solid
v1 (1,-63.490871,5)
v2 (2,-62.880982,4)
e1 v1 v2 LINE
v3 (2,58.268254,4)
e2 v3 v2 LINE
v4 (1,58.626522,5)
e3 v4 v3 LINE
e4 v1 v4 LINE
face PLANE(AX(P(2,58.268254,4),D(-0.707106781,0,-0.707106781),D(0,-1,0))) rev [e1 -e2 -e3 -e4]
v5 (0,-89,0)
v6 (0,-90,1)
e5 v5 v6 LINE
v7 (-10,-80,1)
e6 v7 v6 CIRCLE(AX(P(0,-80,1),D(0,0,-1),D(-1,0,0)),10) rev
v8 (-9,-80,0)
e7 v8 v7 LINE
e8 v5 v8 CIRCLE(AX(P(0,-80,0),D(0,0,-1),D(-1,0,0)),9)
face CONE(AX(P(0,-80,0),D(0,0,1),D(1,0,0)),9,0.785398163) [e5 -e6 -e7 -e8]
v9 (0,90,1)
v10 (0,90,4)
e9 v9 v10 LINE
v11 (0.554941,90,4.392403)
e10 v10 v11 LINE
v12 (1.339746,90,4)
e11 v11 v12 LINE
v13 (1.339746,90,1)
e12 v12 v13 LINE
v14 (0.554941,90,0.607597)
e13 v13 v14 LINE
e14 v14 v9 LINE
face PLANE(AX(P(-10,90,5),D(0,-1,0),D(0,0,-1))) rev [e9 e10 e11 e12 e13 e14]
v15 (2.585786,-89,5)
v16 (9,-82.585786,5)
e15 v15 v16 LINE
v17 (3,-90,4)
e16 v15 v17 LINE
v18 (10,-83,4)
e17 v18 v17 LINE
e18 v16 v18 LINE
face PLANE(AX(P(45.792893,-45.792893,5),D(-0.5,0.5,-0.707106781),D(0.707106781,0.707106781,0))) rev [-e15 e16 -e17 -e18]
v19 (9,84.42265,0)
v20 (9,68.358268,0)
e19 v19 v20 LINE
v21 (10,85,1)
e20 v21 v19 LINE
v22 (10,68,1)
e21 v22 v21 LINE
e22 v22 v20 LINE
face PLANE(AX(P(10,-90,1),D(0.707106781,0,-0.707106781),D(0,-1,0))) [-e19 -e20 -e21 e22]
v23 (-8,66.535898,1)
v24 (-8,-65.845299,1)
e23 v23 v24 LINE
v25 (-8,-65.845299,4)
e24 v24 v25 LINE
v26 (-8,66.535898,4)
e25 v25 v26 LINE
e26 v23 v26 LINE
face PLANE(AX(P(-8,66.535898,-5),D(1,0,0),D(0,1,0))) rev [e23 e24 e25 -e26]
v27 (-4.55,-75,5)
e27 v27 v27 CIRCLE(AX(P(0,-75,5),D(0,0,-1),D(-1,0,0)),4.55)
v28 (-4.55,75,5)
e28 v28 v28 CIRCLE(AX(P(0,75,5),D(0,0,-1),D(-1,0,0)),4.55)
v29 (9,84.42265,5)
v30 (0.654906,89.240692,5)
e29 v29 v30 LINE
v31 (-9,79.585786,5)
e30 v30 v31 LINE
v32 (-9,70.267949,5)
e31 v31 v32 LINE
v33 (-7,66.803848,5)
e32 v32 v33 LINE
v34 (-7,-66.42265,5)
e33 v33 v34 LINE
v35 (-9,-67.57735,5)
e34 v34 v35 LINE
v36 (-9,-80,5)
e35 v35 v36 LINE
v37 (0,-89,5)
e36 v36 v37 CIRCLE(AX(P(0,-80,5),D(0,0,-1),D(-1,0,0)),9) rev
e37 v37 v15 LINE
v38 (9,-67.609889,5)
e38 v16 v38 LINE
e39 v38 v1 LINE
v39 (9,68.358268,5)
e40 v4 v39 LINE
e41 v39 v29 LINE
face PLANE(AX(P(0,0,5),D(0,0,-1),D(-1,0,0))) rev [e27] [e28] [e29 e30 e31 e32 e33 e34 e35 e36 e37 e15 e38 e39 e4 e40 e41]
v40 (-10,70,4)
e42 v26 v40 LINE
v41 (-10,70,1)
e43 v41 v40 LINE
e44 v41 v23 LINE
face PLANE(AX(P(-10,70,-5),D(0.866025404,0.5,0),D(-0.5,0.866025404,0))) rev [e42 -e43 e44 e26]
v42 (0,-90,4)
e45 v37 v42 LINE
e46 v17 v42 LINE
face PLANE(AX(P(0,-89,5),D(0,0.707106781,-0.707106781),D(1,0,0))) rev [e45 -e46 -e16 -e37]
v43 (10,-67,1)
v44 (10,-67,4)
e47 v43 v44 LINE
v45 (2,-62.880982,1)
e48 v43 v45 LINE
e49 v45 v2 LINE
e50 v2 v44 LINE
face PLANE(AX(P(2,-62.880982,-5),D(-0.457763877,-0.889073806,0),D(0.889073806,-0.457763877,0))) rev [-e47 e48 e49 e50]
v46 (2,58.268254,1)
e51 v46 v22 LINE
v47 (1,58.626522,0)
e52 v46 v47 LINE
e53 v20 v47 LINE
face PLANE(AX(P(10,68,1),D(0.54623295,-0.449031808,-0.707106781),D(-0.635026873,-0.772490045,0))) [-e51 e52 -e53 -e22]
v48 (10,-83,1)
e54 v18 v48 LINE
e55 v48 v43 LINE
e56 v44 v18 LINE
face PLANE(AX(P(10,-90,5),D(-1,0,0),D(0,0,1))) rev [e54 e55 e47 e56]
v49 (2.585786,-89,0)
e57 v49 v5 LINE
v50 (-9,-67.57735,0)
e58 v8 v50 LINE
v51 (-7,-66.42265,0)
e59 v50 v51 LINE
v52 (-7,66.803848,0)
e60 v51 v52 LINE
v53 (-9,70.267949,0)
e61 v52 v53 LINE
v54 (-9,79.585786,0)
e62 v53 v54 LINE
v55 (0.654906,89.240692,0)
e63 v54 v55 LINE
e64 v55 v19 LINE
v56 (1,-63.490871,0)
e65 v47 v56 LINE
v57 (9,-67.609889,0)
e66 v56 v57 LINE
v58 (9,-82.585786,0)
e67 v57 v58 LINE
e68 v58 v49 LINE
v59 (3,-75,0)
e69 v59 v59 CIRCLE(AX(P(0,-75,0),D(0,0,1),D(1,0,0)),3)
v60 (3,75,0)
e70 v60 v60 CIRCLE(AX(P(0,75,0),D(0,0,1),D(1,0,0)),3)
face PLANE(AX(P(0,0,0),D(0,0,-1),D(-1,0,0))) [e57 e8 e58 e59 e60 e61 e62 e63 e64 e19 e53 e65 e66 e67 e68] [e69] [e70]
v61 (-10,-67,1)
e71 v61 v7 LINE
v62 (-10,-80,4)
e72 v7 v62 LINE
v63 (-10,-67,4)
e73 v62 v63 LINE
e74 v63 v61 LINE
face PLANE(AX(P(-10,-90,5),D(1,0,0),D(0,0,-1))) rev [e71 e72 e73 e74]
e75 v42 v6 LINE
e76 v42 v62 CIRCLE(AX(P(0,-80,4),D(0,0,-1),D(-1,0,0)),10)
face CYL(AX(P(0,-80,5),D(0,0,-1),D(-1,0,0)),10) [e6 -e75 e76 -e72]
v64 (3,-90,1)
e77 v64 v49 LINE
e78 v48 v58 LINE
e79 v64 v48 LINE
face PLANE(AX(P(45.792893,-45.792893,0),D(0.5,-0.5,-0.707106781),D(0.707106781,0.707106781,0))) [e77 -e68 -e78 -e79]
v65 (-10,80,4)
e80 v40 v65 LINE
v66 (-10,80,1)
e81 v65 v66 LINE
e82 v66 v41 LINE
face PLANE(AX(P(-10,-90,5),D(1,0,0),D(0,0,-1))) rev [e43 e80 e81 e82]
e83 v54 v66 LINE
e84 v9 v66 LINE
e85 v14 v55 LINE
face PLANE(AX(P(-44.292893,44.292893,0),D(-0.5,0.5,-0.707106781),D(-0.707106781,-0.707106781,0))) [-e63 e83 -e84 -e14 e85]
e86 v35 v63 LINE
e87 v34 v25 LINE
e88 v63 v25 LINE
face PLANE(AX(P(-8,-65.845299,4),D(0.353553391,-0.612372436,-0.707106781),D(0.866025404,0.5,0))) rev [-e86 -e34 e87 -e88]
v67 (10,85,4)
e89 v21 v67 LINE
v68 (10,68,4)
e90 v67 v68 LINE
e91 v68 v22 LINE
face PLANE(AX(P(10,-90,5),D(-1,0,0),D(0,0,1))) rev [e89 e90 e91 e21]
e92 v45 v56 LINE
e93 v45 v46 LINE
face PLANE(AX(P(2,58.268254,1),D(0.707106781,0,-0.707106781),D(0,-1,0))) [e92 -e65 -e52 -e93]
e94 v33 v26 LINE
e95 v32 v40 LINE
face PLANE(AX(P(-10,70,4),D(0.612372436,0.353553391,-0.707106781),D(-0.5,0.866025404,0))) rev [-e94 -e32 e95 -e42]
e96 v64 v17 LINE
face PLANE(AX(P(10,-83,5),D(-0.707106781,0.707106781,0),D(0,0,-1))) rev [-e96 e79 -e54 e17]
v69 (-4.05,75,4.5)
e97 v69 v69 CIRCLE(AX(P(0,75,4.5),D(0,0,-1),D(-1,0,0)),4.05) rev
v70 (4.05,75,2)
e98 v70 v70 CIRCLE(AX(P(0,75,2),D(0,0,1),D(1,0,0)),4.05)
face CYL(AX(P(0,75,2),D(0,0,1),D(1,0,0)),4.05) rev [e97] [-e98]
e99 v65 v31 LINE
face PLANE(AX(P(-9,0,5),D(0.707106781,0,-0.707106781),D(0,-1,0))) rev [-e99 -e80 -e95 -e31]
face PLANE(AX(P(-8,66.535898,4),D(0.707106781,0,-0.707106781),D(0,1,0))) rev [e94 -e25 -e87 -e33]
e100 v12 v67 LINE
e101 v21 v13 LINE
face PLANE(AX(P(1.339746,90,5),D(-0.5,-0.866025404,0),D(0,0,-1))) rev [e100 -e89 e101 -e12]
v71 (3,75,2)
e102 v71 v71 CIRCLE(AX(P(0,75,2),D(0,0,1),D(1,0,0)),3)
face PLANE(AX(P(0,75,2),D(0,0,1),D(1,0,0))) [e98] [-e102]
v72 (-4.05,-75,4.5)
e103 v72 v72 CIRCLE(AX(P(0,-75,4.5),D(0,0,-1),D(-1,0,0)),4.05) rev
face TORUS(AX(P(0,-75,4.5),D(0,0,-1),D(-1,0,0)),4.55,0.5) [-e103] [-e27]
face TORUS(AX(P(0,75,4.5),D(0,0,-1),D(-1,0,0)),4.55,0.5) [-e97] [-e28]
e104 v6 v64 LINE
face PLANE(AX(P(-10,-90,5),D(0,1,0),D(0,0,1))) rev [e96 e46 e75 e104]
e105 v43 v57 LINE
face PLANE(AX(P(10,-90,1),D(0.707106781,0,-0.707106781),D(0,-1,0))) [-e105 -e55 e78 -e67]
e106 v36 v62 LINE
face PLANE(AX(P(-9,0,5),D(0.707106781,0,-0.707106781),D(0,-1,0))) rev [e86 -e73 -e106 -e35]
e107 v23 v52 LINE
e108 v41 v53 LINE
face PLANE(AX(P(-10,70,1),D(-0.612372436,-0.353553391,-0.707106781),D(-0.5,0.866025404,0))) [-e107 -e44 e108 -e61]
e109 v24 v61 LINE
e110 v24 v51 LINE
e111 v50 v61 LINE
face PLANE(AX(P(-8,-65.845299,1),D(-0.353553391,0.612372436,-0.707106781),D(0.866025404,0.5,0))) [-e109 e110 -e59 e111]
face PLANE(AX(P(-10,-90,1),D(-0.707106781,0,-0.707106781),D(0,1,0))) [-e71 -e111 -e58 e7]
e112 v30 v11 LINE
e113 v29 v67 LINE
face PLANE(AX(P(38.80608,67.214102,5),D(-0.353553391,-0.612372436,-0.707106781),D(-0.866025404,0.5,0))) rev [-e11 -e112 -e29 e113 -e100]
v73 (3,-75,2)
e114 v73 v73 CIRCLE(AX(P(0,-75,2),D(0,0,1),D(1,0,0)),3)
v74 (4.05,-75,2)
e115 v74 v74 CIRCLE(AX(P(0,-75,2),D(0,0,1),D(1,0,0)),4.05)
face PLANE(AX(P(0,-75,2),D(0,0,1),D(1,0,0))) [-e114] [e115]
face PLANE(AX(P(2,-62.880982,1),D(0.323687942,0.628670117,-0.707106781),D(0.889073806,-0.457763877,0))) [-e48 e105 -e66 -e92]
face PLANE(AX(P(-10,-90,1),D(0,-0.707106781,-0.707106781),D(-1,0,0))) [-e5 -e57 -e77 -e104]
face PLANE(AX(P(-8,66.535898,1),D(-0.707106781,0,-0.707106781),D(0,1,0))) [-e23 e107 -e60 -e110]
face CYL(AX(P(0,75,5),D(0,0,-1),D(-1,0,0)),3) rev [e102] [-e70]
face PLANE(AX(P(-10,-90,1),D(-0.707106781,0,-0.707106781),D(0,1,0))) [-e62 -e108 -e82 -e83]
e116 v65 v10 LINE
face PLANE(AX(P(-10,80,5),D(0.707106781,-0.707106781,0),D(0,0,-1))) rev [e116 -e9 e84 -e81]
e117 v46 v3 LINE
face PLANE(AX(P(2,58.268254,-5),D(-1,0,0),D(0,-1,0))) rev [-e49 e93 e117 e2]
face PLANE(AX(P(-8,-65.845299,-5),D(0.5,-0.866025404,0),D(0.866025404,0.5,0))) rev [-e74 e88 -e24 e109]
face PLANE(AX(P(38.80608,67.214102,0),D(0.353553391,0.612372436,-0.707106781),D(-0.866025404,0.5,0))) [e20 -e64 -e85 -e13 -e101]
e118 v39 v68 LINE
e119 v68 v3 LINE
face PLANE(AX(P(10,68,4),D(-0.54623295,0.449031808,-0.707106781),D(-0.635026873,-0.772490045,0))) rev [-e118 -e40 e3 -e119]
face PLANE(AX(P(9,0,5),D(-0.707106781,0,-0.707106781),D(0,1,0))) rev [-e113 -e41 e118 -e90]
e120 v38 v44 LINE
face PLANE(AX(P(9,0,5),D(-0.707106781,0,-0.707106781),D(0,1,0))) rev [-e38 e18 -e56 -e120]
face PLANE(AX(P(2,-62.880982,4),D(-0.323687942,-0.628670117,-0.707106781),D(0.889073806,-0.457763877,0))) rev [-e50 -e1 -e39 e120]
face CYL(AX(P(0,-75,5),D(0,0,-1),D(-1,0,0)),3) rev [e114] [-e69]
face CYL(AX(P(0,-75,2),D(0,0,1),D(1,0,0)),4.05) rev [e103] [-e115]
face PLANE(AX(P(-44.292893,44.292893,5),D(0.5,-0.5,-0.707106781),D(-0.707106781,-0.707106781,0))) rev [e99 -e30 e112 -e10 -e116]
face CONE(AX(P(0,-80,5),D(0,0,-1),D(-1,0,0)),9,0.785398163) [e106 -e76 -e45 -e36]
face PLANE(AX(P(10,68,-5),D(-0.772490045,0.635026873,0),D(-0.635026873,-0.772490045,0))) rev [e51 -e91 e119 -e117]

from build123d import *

# Parameters (mm, degrees)
SKETCH_1_W          = 20
SKETCH_1_H          = 180
SKETCH_1_R          = 3
EXTRUDE_1_DEPTH     = 5
SKETCH_2_R          = 4.05
CUT_EXTRUDE_1_DEPTH = 3
CHAMFER_1_SIZE      = 10
CHAMFER_2_SIZE      = 5
CHAMFER_2_SIZE2     = 8.660254038
CUT_EXTRUDE_2_DEPTH = 10
FILLET_1_R          = 10
CHAMFER_3_SIZE      = 7
CHAMFER_5_SIZE      = 1
CUT_EXTRUDE_3_DEPTH = 10
CHAMFER_6_SIZE      = 1
FILLET_2_R          = 0.5
FILLET_3_R          = 0.5


with BuildPart() as part:
    # 草图1 → 凸台-拉伸1 (new body)
    with BuildSketch(Plane.XY):
        Rectangle(SKETCH_1_W, SKETCH_1_H)
        with Locations((0, -75)):
            Circle(SKETCH_1_R, mode=Mode.SUBTRACT)
        with Locations((0, 75)):
            Circle(SKETCH_1_R, mode=Mode.SUBTRACT)
    extrude(amount=EXTRUDE_1_DEPTH)

    # 草图2 → 切除-拉伸1 (cut)
    with BuildSketch(Plane.XY.offset(5)):
        with Locations((0, 75)):
            Circle(SKETCH_2_R)
        with Locations((0, -75)):
            Circle(SKETCH_2_R)
    extrude(amount=-CUT_EXTRUDE_1_DEPTH, mode=Mode.SUBTRACT)

    # 倒角1
    chamfer_1_edges = [part.edges().sort_by_distance(p)[0] for p in [
        (-10, 90, 2.5),
    ]]
    chamfer(chamfer_1_edges, length=CHAMFER_1_SIZE)

    # 倒角2
    chamfer_2_edges = [part.edges().sort_by_distance(p)[0] for p in [
        (10, 90, 2.5),
    ]]
    chamfer_2_side = [part.faces().sort_by_distance(p)[0] for p in [
        (10, 0, 2.5),
    ]]
    chamfer(chamfer_2_edges, length=CHAMFER_2_SIZE, length2=CHAMFER_2_SIZE2, reference=chamfer_2_side[0])

    # 草图3 → 切除-拉伸2 (cut)
    with BuildSketch(Plane.XY.offset(5)):
        Polygon((10, 68), (2, 58.268253796), (2, -62.880981993), (10, -67), align=None)
    extrude(amount=-CUT_EXTRUDE_2_DEPTH, mode=Mode.SUBTRACT)

    # 圆角1
    fillet_1_edges = [part.edges().sort_by_distance(p)[0] for p in [
        (-10, -90, 2.5),
    ]]
    fillet(fillet_1_edges, radius=FILLET_1_R)

    # 倒角3
    chamfer_3_edges = [part.edges().sort_by_distance(p)[0] for p in [
        (10, -90, 2.5),
    ]]
    chamfer(chamfer_3_edges, length=CHAMFER_3_SIZE)

    # 倒角5
    # the kernel refuses this chamfer: 1 mm, written as the material it takes off along each edge
    with BuildSketch(Plane(origin=(-11.81845448, 78.18154552, 0), x_dir=(0.7068394360706736, -0.7068394360706736, -0.02749587661058609), z_dir=(0.7071067811865476, 0.7071067811865476, 0)), Plane(origin=(-11.81845448, 78.18154552, 5), x_dir=(-0.019442520806012064, 0.019442520806012064, -0.9996219169112968), z_dir=(0.7071067811865476, 0.7071067811865476, 0))) as chamfer_5_piece_1:
        Polygon((CHAMFER_5_SIZE * 0.999621916911, -CHAMFER_5_SIZE * 0.0274958766106), (-CHAMFER_5_SIZE * 0.0274958766106, -CHAMFER_5_SIZE * 0.999621916911), (0, 0), align=None)
    extrude(amount=19.2855016, mode=Mode.SUBTRACT)
    with BuildSketch(Plane(origin=(12.227142798, 83.714158506, 0), x_dir=(-0.49981095845564655, -0.8656979742248815, -0.02749587661058648), z_dir=(-0.8660254037844397, 0.49999999999999817, 0)), Plane(origin=(12.227142798, 83.714158506, 5), x_dir=(0.013747938305290464, 0.02381212764408557, -0.999621916911297), z_dir=(-0.8660254037844397, 0.49999999999999817, 0))) as chamfer_5_piece_2:
        Polygon((CHAMFER_5_SIZE * 0.999621916911, CHAMFER_5_SIZE * 0.0274958766106), (-CHAMFER_5_SIZE * 0.0274958766106, CHAMFER_5_SIZE * 0.999621916911), (0, 0), align=None)
    extrude(amount=15.143365976, mode=Mode.SUBTRACT)
    with BuildSketch(Plane(origin=(1.18154552, -91.81845448, 0), x_dir=(-0.7068394360706736, 0.7068394360706735, -0.027495876610586254), z_dir=(0.7071067811865476, 0.7071067811865476, 0)), Plane(origin=(1.18154552, -91.81845448, 5), x_dir=(0.01944252080601271, -0.01944252080601271, -0.9996219169112968), z_dir=(0.7071067811865476, 0.7071067811865476, 0))) as chamfer_5_piece_3:
        Polygon((CHAMFER_5_SIZE * 0.999621916911, CHAMFER_5_SIZE * 0.0274958766106), (-CHAMFER_5_SIZE * 0.0274958766106, CHAMFER_5_SIZE * 0.999621916911), (0, 0), align=None)
    extrude(amount=15.042860913, mode=Mode.SUBTRACT)
    with BuildSketch(Plane(origin=(10, -85.571682988, 0), x_dir=(-0.9996219169112968, 0, -0.02749587661058639), z_dir=(0, 1, 0)), Plane(origin=(10, -85.571682988, 5), x_dir=(0.027495876610585623, 0, -0.9996219169112968), z_dir=(0, 1, 0))) as chamfer_5_piece_4:
        Polygon((CHAMFER_5_SIZE * 0.999621916911, CHAMFER_5_SIZE * 0.0274958766106), (-CHAMFER_5_SIZE * 0.0274958766106, CHAMFER_5_SIZE * 0.999621916911), (0, 0), align=None)
    extrude(amount=21.143365976, mode=Mode.SUBTRACT)
    with BuildSketch(Plane(origin=(-0.286415982, -61.703758417, 0), x_dir=(-0.4575908043726023, -0.8887376623745898, -0.027495876610586185), z_dir=(0.8890738061453024, -0.4577638771531731, 0))) as chamfer_5_piece_5_section:
        Polygon((CHAMFER_5_SIZE * 0.999621916911, -CHAMFER_5_SIZE * 0.0274958766106), (-CHAMFER_5_SIZE * 0.0274958766106, -CHAMFER_5_SIZE * 0.999621916911), (0, 0), align=None)
    chamfer_5_piece_5 = extrude(amount=14.141494078, mode=Mode.PRIVATE)
    chamfer_5_piece_5 = split(chamfer_5_piece_5, bisect_by=Plane(origin=(2, -65.858290637, 0.331326909), z_dir=(1, 0, 0)), keep=Keep.TOP, mode=Mode.PRIVATE)
    add(chamfer_5_piece_5, mode=Mode.SUBTRACT)
    with BuildSketch(Plane(origin=(10, 65.428317012, 0), x_dir=(-0.9996219169112968, 0, -0.02749587661058639), z_dir=(0, 1, 0)), Plane(origin=(10, 65.428317012, 5), x_dir=(0.027495876610585623, 0, -0.9996219169112968), z_dir=(0, 1, 0))) as chamfer_5_piece_6:
        Polygon((CHAMFER_5_SIZE * 0.999621916911, CHAMFER_5_SIZE * 0.0274958766106), (-CHAMFER_5_SIZE * 0.0274958766106, CHAMFER_5_SIZE * 0.999621916911), (0, 0), align=None)
    extrude(amount=22.143365976, mode=Mode.SUBTRACT)
    with BuildSketch(Plane(origin=(11.633087807, 69.986599508, 0), x_dir=(-0.7721979799806099, 0.6347867803312237, -0.02749587661058653), z_dir=(-0.6350268732528727, -0.7724900454029683, 0))) as chamfer_5_piece_7_section:
        Polygon((CHAMFER_5_SIZE * 0.999621916911, -CHAMFER_5_SIZE * 0.0274958766106), (-CHAMFER_5_SIZE * 0.0274958766106, -CHAMFER_5_SIZE * 0.999621916911), (0, 0), align=None)
    chamfer_5_piece_7 = extrude(amount=17.741258029, mode=Mode.PRIVATE)
    chamfer_5_piece_7 = split(chamfer_5_piece_7, bisect_by=Plane(origin=(2, 64.486030302, 0.332589974), z_dir=(1, 0, 0)), keep=Keep.TOP, mode=Mode.PRIVATE)
    add(chamfer_5_piece_7, mode=Mode.SUBTRACT)
    with BuildSketch(Plane(origin=(2, 60.839936784, 0), x_dir=(-0.9996219169112968, 0, -0.027495876610586365), z_dir=(0, -1, 0))) as chamfer_5_piece_8_section:
        Polygon((CHAMFER_5_SIZE * 0.999621916911, -CHAMFER_5_SIZE * 0.0274958766106), (-CHAMFER_5_SIZE * 0.0274958766106, -CHAMFER_5_SIZE * 0.999621916911), (0, 0), align=None)
    chamfer_5_piece_8 = extrude(amount=126.292601765, mode=Mode.PRIVATE)
    chamfer_5_piece_8 = split(chamfer_5_piece_8, bisect_by=Plane(origin=(-22.866025016, -50.078031392, 0.330281086), z_dir=(0.4577638771531731, 0.8890738061453024, 0)), keep=Keep.TOP, mode=Mode.PRIVATE)
    chamfer_5_piece_8 = split(chamfer_5_piece_8, bisect_by=Plane(origin=(-27.904215912, 21.890723836, 0.330281086), z_dir=(0.7724900454029683, -0.6350268732528727, 0)), keep=Keep.TOP, mode=Mode.PRIVATE)
    add(chamfer_5_piece_8, mode=Mode.SUBTRACT)
    with BuildSketch(Plane(origin=(-0.286415982, -61.703758417, 5), x_dir=(0.012586619082987256, 0.024445863671475603, -0.9996219169112968), z_dir=(0.8890738061453024, -0.4577638771531731, 0))) as chamfer_5_piece_9_section:
        Polygon((CHAMFER_5_SIZE * 0.999621916911, -CHAMFER_5_SIZE * 0.0274958766106), (-CHAMFER_5_SIZE * 0.0274958766106, -CHAMFER_5_SIZE * 0.999621916911), (0, 0), align=None)
    chamfer_5_piece_9 = extrude(amount=14.141494078, mode=Mode.PRIVATE)
    chamfer_5_piece_9 = split(chamfer_5_piece_9, bisect_by=Plane(origin=(2, -65.858290637, 4.668673091), z_dir=(1, 0, 0)), keep=Keep.TOP, mode=Mode.PRIVATE)
    add(chamfer_5_piece_9, mode=Mode.SUBTRACT)
    with BuildSketch(Plane(origin=(11.633087807, 69.986599508, 5), x_dir=(0.02124029097130686, -0.017460620551367937, -0.9996219169112968), z_dir=(-0.6350268732528727, -0.7724900454029683, 0))) as chamfer_5_piece_10_section:
        Polygon((CHAMFER_5_SIZE * 0.999621916911, -CHAMFER_5_SIZE * 0.0274958766106), (-CHAMFER_5_SIZE * 0.0274958766106, -CHAMFER_5_SIZE * 0.999621916911), (0, 0), align=None)
    chamfer_5_piece_10 = extrude(amount=17.741258029, mode=Mode.PRIVATE)
    chamfer_5_piece_10 = split(chamfer_5_piece_10, bisect_by=Plane(origin=(2, 64.486030302, 4.667410026), z_dir=(1, 0, 0)), keep=Keep.TOP, mode=Mode.PRIVATE)
    add(chamfer_5_piece_10, mode=Mode.SUBTRACT)
    with BuildSketch(Plane(origin=(2, 60.839936784, 5), x_dir=(0.027495876610586487, 0, -0.9996219169112968), z_dir=(0, -1, 0))) as chamfer_5_piece_11_section:
        Polygon((CHAMFER_5_SIZE * 0.999621916911, -CHAMFER_5_SIZE * 0.0274958766106), (-CHAMFER_5_SIZE * 0.0274958766106, -CHAMFER_5_SIZE * 0.999621916911), (0, 0), align=None)
    chamfer_5_piece_11 = extrude(amount=126.292601765, mode=Mode.PRIVATE)
    chamfer_5_piece_11 = split(chamfer_5_piece_11, bisect_by=Plane(origin=(-22.866025016, -50.078031392, 4.669718914), z_dir=(0.4577638771531731, 0.8890738061453024, 0)), keep=Keep.TOP, mode=Mode.PRIVATE)
    chamfer_5_piece_11 = split(chamfer_5_piece_11, bisect_by=Plane(origin=(-27.904215912, 21.890723836, 4.669718914), z_dir=(0.7724900454029683, -0.6350268732528727, 0)), keep=Keep.TOP, mode=Mode.PRIVATE)
    add(chamfer_5_piece_11, mode=Mode.SUBTRACT)
    with BuildSketch(Plane(origin=(-0.286415982, -61.703758417, 0), x_dir=(-0.4575908043726023, -0.8887376623745898, -0.027495876610586185), z_dir=(0.8890738061453024, -0.4577638771531731, 0))) as chamfer_5_piece_12a_section:
        Polygon((CHAMFER_5_SIZE * 0.999621916911, -CHAMFER_5_SIZE * 0.0274958766106), (-CHAMFER_5_SIZE * 0.0274958766106, -CHAMFER_5_SIZE * 0.999621916911), (0, 0), align=None)
    chamfer_5_piece_12a = extrude(amount=14.141494078, mode=Mode.PRIVATE)
    chamfer_5_piece_12a = split(chamfer_5_piece_12a, bisect_by=Plane(origin=(2, -62.636454887, 0.323417731), z_dir=(-1, 0, 0)), keep=Keep.TOP, mode=Mode.PRIVATE)
    with BuildSketch(Plane(origin=(2, 60.839936784, 0), x_dir=(-0.9996219169112968, 0, -0.027495876610586365), z_dir=(0, -1, 0))) as chamfer_5_piece_12b_section:
        Polygon((CHAMFER_5_SIZE * 0.999621916911, -CHAMFER_5_SIZE * 0.0274958766106), (-CHAMFER_5_SIZE * 0.0274958766106, -CHAMFER_5_SIZE * 0.999621916911), (0, 0), align=None)
    chamfer_5_piece_12b = extrude(amount=126.292601765, mode=Mode.PRIVATE)
    chamfer_5_piece_12b = split(chamfer_5_piece_12b, bisect_by=Plane(origin=(2.217402645, -62.992917669, 0.323417731), z_dir=(-0.4577638771531731, -0.8890738061453024, 0)), keep=Keep.TOP, mode=Mode.PRIVATE)
    chamfer_5_piece_12 = chamfer_5_piece_12a & chamfer_5_piece_12b
    add(chamfer_5_piece_12, mode=Mode.SUBTRACT)
    with BuildSketch(Plane(origin=(2, 60.839936784, 0), x_dir=(-0.9996219169112968, 0, -0.027495876610586365), z_dir=(0, -1, 0))) as chamfer_5_piece_13a_section:
        Polygon((CHAMFER_5_SIZE * 0.999621916911, -CHAMFER_5_SIZE * 0.0274958766106), (-CHAMFER_5_SIZE * 0.0274958766106, -CHAMFER_5_SIZE * 0.999621916911), (0, 0), align=None)
    chamfer_5_piece_13a = extrude(amount=126.292601765, mode=Mode.PRIVATE)
    chamfer_5_piece_13a = split(chamfer_5_piece_13a, bisect_by=Plane(origin=(2.381147495, 58.731907632, 0.315902133), z_dir=(-0.7724900454029683, 0.6350268732528727, 0)), keep=Keep.TOP, mode=Mode.PRIVATE)
    with BuildSketch(Plane(origin=(11.633087807, 69.986599508, 0), x_dir=(-0.7721979799806099, 0.6347867803312237, -0.02749587661058653), z_dir=(-0.6350268732528727, -0.7724900454029683, 0))) as chamfer_5_piece_13b_section:
        Polygon((CHAMFER_5_SIZE * 0.999621916911, -CHAMFER_5_SIZE * 0.0274958766106), (-CHAMFER_5_SIZE * 0.0274958766106, -CHAMFER_5_SIZE * 0.999621916911), (0, 0), align=None)
    chamfer_5_piece_13b = extrude(amount=17.741258029, mode=Mode.PRIVATE)
    chamfer_5_piece_13b = split(chamfer_5_piece_13b, bisect_by=Plane(origin=(2, 57.668046921, 0.315902133), z_dir=(-1, 0, 0)), keep=Keep.TOP, mode=Mode.PRIVATE)
    chamfer_5_piece_13 = chamfer_5_piece_13a & chamfer_5_piece_13b
    add(chamfer_5_piece_13, mode=Mode.SUBTRACT)
    with BuildSketch(Plane(origin=(-0.286415982, -61.703758417, 5), x_dir=(0.012586619082987256, 0.024445863671475603, -0.9996219169112968), z_dir=(0.8890738061453024, -0.4577638771531731, 0))) as chamfer_5_piece_14a_section:
        Polygon((CHAMFER_5_SIZE * 0.999621916911, -CHAMFER_5_SIZE * 0.0274958766106), (-CHAMFER_5_SIZE * 0.0274958766106, -CHAMFER_5_SIZE * 0.999621916911), (0, 0), align=None)
    chamfer_5_piece_14a = extrude(amount=14.141494078, mode=Mode.PRIVATE)
    chamfer_5_piece_14a = split(chamfer_5_piece_14a, bisect_by=Plane(origin=(2, -62.636454887, 4.676582269), z_dir=(-1, 0, 0)), keep=Keep.TOP, mode=Mode.PRIVATE)
    with BuildSketch(Plane(origin=(2, 60.839936784, 5), x_dir=(0.027495876610586487, 0, -0.9996219169112968), z_dir=(0, -1, 0))) as chamfer_5_piece_14b_section:
        Polygon((CHAMFER_5_SIZE * 0.999621916911, -CHAMFER_5_SIZE * 0.0274958766106), (-CHAMFER_5_SIZE * 0.0274958766106, -CHAMFER_5_SIZE * 0.999621916911), (0, 0), align=None)
    chamfer_5_piece_14b = extrude(amount=126.292601765, mode=Mode.PRIVATE)
    chamfer_5_piece_14b = split(chamfer_5_piece_14b, bisect_by=Plane(origin=(2.217402645, -62.992917669, 4.676582269), z_dir=(-0.4577638771531731, -0.8890738061453024, 0)), keep=Keep.TOP, mode=Mode.PRIVATE)
    chamfer_5_piece_14 = chamfer_5_piece_14a & chamfer_5_piece_14b
    add(chamfer_5_piece_14, mode=Mode.SUBTRACT)
    with BuildSketch(Plane(origin=(2, 60.839936784, 5), x_dir=(0.027495876610586487, 0, -0.9996219169112968), z_dir=(0, -1, 0))) as chamfer_5_piece_15a_section:
        Polygon((CHAMFER_5_SIZE * 0.999621916911, -CHAMFER_5_SIZE * 0.0274958766106), (-CHAMFER_5_SIZE * 0.0274958766106, -CHAMFER_5_SIZE * 0.999621916911), (0, 0), align=None)
    chamfer_5_piece_15a = extrude(amount=126.292601765, mode=Mode.PRIVATE)
    chamfer_5_piece_15a = split(chamfer_5_piece_15a, bisect_by=Plane(origin=(2.381147495, 58.731907632, 4.684097867), z_dir=(-0.7724900454029683, 0.6350268732528727, 0)), keep=Keep.TOP, mode=Mode.PRIVATE)
    with BuildSketch(Plane(origin=(11.633087807, 69.986599508, 5), x_dir=(0.02124029097130686, -0.017460620551367937, -0.9996219169112968), z_dir=(-0.6350268732528727, -0.7724900454029683, 0))) as chamfer_5_piece_15b_section:
        Polygon((CHAMFER_5_SIZE * 0.999621916911, -CHAMFER_5_SIZE * 0.0274958766106), (-CHAMFER_5_SIZE * 0.0274958766106, -CHAMFER_5_SIZE * 0.999621916911), (0, 0), align=None)
    chamfer_5_piece_15b = extrude(amount=17.741258029, mode=Mode.PRIVATE)
    chamfer_5_piece_15b = split(chamfer_5_piece_15b, bisect_by=Plane(origin=(2, 57.668046921, 4.684097867), z_dir=(-1, 0, 0)), keep=Keep.TOP, mode=Mode.PRIVATE)
    chamfer_5_piece_15 = chamfer_5_piece_15a & chamfer_5_piece_15b
    add(chamfer_5_piece_15, mode=Mode.SUBTRACT)

    # 草图4 → 切除-拉伸3 (cut)
    with BuildSketch(Plane.XY.offset(5)):
        Polygon((-10, 70), (-8, 66.535898385), (-8, -65.845299462), (-10, -67), align=None)
    extrude(amount=-CUT_EXTRUDE_3_DEPTH, mode=Mode.SUBTRACT)

    # 倒角6
    chamfer_6_edges = [part.edges().sort_by_distance(p)[0] for p in [
        (-9, -66.422649731, 0),
        (-10, 74.292893219, 0),
        (-9, 68.267949192, 0),
        (-8, 0.345299462, 0),
        (0.792893219, -90, 0),
        (-10, -73.5, 0),
        (-7.071067812, -87.071067812, 0),
        (0.792893219, -90, 5),
        (-7.071067812, -87.071067812, 5),
        (-10, 74.292893219, 5),
        (-9, 68.267949192, 5),
        (-8, 0.345299462, 5),
        (-9, -66.422649731, 5),
        (-10, -73.5, 5),
    ]]
    chamfer(chamfer_6_edges, length=CHAMFER_6_SIZE)

    # 圆角2
    fillet_2_edges = [part.edges().sort_by_distance(p)[0] for p in [
        (-4.05, -75, 5),
    ]]
    fillet(fillet_2_edges, radius=FILLET_2_R)

    # 圆角3
    fillet_3_edges = [part.edges().sort_by_distance(p)[0] for p in [
        (-4.05, 75, 5),
    ]]
    fillet(fillet_3_edges, radius=FILLET_3_R)


solid = part.part
